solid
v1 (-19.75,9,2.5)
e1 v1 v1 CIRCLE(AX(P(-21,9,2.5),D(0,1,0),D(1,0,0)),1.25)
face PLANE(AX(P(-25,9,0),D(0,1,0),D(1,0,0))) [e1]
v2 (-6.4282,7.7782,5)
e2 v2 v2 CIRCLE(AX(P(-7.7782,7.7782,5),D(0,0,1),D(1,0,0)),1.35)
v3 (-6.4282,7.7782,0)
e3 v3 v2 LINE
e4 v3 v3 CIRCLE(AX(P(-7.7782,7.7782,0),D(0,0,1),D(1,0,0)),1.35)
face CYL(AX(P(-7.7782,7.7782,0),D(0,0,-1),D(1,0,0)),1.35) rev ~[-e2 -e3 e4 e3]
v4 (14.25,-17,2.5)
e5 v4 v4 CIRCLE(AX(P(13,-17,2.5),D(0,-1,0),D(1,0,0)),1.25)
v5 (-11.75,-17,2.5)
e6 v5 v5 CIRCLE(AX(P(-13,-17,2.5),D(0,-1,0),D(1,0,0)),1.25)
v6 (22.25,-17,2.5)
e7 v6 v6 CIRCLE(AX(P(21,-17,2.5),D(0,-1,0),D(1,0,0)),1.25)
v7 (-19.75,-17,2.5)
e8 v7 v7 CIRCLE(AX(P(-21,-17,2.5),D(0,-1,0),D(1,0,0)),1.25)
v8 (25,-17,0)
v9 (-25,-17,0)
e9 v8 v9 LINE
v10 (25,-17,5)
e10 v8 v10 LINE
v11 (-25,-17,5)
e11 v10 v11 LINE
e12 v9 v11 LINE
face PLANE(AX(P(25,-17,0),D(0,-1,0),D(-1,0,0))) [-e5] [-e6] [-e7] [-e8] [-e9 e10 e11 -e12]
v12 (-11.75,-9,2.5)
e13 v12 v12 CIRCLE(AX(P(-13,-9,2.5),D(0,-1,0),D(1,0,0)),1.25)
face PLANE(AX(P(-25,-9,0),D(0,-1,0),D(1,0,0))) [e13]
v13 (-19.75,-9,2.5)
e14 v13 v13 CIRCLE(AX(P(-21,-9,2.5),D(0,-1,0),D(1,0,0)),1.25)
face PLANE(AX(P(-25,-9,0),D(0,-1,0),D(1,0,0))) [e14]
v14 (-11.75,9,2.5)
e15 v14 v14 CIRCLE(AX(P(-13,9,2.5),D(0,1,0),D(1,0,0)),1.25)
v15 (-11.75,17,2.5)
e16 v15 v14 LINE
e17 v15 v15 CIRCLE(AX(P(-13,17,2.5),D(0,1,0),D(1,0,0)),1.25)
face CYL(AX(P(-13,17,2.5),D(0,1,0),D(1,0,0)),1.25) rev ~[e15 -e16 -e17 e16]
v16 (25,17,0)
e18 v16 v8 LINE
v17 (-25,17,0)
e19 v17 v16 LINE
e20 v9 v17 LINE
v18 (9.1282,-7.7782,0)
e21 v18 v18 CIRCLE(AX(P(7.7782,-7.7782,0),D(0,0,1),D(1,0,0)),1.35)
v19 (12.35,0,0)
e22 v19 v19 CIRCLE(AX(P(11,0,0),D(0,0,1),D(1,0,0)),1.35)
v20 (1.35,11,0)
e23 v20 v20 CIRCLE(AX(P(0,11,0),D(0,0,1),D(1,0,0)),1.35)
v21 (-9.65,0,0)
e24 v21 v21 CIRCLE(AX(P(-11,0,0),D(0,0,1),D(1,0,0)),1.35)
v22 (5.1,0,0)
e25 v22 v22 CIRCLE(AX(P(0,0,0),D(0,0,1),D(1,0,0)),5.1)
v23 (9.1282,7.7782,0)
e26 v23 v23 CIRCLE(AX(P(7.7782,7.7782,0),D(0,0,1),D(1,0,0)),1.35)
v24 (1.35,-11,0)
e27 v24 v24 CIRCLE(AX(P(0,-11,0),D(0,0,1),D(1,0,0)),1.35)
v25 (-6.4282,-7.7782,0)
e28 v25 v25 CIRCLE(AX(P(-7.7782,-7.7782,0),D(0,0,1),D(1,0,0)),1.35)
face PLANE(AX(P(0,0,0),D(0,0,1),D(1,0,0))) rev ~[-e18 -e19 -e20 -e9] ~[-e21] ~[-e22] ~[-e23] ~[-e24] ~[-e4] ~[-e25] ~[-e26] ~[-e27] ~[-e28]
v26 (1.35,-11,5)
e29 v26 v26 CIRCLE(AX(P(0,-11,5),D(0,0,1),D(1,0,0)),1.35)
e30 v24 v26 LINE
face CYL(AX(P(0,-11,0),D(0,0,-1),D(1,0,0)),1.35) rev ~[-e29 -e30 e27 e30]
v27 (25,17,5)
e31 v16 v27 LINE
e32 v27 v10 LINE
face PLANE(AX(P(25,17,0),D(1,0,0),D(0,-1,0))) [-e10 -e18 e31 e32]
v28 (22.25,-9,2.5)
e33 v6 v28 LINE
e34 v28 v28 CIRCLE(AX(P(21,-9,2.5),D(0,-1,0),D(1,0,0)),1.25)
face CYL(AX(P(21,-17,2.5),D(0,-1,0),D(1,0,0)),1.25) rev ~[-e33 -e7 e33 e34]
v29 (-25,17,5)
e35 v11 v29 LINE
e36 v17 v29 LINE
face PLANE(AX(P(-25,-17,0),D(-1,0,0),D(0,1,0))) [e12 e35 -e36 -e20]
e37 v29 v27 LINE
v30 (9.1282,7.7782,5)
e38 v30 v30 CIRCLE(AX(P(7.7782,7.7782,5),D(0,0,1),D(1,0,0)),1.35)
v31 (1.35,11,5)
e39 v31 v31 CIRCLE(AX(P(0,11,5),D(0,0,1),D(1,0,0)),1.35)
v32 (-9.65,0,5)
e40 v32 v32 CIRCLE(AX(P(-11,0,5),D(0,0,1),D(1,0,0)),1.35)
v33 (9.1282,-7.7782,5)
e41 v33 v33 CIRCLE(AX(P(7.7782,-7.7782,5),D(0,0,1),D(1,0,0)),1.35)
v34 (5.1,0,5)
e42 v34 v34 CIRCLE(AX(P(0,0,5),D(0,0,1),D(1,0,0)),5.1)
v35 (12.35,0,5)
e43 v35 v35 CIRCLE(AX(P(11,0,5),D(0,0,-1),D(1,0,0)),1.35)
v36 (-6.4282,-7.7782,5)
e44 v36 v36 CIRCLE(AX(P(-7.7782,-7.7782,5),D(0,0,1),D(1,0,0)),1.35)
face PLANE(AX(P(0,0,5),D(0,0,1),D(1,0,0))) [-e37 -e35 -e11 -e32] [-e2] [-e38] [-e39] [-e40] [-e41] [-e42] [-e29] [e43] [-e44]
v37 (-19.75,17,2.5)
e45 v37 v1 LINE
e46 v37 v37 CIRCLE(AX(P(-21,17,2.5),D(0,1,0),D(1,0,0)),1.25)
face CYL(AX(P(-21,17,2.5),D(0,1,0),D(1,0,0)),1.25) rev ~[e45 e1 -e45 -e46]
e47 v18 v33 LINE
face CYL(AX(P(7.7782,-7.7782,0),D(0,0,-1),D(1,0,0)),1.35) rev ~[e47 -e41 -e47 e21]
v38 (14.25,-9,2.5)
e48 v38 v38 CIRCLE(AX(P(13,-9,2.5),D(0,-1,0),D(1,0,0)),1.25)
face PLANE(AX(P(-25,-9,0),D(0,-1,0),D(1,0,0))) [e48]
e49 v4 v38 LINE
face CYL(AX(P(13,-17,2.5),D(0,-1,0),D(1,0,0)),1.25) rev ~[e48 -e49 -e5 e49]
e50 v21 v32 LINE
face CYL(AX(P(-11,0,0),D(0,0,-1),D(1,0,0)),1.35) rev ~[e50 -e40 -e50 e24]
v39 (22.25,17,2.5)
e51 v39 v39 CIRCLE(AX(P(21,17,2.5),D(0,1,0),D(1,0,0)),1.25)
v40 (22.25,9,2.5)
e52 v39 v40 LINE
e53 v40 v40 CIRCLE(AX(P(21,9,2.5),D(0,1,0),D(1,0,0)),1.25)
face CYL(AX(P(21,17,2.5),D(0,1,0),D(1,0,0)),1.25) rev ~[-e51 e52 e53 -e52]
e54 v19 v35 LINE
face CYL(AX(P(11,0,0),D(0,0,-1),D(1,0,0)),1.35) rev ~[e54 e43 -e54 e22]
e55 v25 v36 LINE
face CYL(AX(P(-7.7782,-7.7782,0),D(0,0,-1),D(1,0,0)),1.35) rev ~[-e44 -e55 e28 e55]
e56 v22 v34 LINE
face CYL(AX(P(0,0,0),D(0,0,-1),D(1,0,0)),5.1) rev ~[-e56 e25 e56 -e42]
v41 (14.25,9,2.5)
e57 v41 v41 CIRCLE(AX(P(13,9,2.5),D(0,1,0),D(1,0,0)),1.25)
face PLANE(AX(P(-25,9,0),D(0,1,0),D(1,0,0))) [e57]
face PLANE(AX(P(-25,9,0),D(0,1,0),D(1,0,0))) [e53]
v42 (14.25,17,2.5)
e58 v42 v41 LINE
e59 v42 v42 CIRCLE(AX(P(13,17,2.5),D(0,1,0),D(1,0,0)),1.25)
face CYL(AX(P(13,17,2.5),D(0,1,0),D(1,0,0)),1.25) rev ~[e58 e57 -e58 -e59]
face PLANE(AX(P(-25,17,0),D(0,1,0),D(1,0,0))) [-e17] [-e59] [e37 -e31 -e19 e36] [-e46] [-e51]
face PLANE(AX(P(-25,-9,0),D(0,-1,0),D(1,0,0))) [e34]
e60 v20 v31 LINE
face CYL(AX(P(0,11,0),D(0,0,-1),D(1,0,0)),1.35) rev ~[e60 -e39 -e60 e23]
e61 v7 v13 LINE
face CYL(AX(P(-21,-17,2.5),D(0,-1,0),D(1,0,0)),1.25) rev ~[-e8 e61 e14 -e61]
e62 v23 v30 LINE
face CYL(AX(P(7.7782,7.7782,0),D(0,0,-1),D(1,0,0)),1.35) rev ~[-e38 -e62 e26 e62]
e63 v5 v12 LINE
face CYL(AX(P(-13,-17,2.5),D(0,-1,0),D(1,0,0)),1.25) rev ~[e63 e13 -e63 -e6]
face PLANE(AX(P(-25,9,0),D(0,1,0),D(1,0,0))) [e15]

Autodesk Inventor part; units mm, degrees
ref_plane "YZ Plane" through (0, 0, 0) normal (1, 0, 0) x (0, 1, 0)
ref_plane "XZ Plane" through (0, 0, 0) normal (0, 1, 0) x (-1, 0, 0)
ref_plane "XY Plane" through (0, 0, 0) normal (0, 0, 1) x (1, 0, 0)
sketch "스케치1" plane through (0, 0, 0) normal (0, 0, 1) x (1, 0, 0)
  line L0 (-25, 17) -> (25, 17)
  line L1 (25, 17) -> (25, -17)
  line L2 (25, -17) -> (-25, -17)
  line L3 (-25, -17) -> (-25, 17)
  circle A0 centre (0, 0) radius 5.1
  line L4 (0, 0) -> (11, 0)
  line L5 (0, 0) -> (11, 0) construction
  circle A1 centre (11, 0) radius 1.35
  circle A2 centre (7.7782, 7.7782) radius 1.35
  circle A3 centre (0, 11) radius 1.35
  circle A4 centre (-7.7782, 7.7782) radius 1.35
  circle A5 centre (-11, 0) radius 1.35
  circle A6 centre (-7.7782, -7.7782) radius 1.35
  circle A7 centre (0, -11) radius 1.35
  circle A8 centre (7.7782, -7.7782) radius 1.35
  dimension "d0" = 50
  dimension "d1" = 34
  dimension "d2" = 17
  dimension "d3" = 25
  dimension "d4" = 10.2
  dimension "d5" = 11
  dimension "d6" = 0
  dimension "d7" = 2.7
  dimension "d10" = 360
extrude "돌출1" add sketch "스케치1" along normal blind 5
sketch "스케치2" plane through (-25, -17, 0) normal (0, -1, 0) x (1, 0, 0)
  circle A0 centre (4, 2.5) radius 1.25
  circle A1 centre (12, 2.5) radius 1.25
  circle A2 centre (38, 2.5) radius 1.25
  circle A3 centre (46, 2.5) radius 1.25
  line L0 (50, 0) -> (0, 0) projected
  line L1 (0, 0) -> (0, 5) projected
  line L2 (50, 0) -> (50, 5) projected
  point P0 (25, 0)
  dimension "d14" = 2.5
  dimension "d15" = 2.5
  dimension "d16" = 2.5
  dimension "d17" = 2.5
  dimension "d18" = 2.5
  dimension "d19" = 2.5
  dimension "d20" = 2.5
  dimension "d21" = 2.5
  dimension "d22" = 4
  dimension "d23" = 8
  dimension "d24" = 4
  dimension "d25" = 8
extrude "돌출2" cut sketch "스케치2" against normal blind 8
sketch "스케치3" plane through (-25, 17, 0) normal (0, 1, 0) x (1, 0, 0)
  circle A0 centre (38, -2.5) radius 1.25 projected
  circle A1 centre (4, -2.5) radius 1.25 projected
  circle A2 centre (12, -2.5) radius 1.25 projected
  circle A3 centre (46, -2.5) radius 1.25 projected
  line L0 (50, 0) -> (0, 0) projected
  line L1 (50, 0) -> (50, -5) projected
  line L2 (0, -5) -> (50, -5) projected
  line L3 (0, 0) -> (0, -5) projected
  point P0 (25, 0)
extrude "돌출3" cut sketch "스케치3" against normal blind 8 contours A0 | A1 | A2 | A3
equation "\"d2\" = 0.5 * d1"
equation "\"d3\" = 0.5 * d0"
equation "\"d25\" = d23"
properties part number "Box_Top" material "알루미늄 6061"
